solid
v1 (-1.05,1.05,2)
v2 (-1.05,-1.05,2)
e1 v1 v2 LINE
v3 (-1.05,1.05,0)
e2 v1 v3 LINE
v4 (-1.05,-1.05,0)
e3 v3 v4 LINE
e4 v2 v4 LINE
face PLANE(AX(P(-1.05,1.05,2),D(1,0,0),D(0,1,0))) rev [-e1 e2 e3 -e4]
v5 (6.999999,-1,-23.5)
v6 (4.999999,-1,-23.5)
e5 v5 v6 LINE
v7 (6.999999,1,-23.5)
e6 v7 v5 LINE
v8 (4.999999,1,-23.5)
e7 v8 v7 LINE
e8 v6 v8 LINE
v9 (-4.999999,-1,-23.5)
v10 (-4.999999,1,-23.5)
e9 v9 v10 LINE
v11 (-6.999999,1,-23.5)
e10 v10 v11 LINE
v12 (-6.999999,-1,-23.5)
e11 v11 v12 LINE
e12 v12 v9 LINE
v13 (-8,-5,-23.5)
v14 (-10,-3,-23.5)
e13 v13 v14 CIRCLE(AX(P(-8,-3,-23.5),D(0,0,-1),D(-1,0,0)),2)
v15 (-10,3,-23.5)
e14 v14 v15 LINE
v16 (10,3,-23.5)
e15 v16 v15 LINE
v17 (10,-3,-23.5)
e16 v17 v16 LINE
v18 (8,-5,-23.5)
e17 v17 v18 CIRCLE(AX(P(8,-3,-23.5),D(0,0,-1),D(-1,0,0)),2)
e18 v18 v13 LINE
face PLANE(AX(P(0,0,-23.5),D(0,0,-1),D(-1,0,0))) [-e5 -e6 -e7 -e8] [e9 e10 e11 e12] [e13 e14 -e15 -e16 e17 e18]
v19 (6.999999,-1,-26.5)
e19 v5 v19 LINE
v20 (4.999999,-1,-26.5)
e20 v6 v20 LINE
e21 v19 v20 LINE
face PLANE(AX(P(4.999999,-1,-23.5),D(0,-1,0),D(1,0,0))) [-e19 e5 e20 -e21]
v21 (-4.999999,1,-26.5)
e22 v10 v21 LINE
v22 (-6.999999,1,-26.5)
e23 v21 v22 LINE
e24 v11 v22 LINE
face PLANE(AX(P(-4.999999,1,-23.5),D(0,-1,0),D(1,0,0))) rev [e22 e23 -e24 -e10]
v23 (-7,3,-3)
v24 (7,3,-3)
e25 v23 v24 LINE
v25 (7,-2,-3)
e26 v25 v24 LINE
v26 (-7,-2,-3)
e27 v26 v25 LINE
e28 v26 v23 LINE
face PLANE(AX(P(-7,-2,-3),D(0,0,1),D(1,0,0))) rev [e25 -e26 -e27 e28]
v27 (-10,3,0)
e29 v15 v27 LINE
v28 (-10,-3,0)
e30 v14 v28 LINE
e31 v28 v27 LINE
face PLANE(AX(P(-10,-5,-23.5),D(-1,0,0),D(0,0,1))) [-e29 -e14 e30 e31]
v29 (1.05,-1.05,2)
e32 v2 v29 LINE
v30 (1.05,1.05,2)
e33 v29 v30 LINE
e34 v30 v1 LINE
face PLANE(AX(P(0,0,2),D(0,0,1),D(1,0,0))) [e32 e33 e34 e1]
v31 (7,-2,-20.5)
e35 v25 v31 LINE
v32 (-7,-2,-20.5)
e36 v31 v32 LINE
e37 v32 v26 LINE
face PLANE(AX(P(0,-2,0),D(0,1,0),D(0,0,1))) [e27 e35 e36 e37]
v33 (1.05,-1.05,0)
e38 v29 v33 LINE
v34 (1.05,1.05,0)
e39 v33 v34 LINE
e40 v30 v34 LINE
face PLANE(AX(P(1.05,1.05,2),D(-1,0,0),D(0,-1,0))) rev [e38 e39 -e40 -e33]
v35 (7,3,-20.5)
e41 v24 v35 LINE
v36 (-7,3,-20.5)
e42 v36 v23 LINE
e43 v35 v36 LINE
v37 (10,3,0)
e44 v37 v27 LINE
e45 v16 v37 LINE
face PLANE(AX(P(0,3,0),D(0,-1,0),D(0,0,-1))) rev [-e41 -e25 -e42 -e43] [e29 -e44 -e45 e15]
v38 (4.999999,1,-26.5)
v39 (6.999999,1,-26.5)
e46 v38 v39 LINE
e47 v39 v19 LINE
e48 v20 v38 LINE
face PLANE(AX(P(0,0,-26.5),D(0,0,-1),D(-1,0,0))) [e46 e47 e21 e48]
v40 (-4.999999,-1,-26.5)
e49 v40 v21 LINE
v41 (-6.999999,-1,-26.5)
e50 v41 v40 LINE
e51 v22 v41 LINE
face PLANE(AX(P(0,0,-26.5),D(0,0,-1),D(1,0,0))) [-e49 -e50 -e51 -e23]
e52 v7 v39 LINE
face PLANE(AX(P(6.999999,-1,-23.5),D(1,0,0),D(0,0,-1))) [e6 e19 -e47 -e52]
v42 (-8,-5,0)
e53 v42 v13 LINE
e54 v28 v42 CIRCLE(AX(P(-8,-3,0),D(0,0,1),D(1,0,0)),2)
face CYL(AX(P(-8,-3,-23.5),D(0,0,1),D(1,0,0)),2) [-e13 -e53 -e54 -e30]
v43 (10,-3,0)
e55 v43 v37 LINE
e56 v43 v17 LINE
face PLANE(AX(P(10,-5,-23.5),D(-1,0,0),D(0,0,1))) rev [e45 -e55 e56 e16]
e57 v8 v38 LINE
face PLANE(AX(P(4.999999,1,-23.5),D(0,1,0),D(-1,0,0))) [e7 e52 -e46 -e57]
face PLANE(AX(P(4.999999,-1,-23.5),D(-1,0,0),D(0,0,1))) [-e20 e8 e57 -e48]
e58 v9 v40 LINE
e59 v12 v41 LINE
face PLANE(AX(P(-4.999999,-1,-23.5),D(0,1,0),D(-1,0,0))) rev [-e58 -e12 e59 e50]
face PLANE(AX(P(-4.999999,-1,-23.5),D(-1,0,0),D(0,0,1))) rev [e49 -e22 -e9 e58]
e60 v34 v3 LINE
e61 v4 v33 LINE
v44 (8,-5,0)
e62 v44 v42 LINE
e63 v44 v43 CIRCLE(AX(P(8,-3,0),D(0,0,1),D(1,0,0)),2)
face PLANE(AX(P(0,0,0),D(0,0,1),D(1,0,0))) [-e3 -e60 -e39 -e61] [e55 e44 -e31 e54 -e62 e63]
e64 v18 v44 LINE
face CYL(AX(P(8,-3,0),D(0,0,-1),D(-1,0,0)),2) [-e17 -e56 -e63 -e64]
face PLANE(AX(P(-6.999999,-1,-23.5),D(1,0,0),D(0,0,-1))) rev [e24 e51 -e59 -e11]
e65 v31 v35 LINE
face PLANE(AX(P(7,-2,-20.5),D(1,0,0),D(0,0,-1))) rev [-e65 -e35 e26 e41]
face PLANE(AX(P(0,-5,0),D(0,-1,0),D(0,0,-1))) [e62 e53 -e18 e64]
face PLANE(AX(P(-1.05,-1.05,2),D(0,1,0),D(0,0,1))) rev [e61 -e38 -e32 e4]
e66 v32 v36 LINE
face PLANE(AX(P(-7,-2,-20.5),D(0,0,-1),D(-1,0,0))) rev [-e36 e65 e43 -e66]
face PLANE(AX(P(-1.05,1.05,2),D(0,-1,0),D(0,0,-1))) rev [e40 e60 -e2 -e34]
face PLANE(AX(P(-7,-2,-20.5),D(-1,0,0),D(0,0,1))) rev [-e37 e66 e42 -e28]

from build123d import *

# Parameters (mm, degrees)
SKETCH1_W                = 2.1
SKETCH1_H                = 2.1
BOSS_EXTRUDE1_DEPTH      = 2
SKETCH4_W                = 2.2
SKETCH4_H                = 2.2
BOSS_EXTRUDE3_DEPTH      = 2
SWEEP4_START             = -1.1
SWEEP4_DEPTH             = 2.2
SKETCH8_W                = 2.2
SKETCH8_H                = 2.2
SKETCH8_W_2              = 2
SKETCH8_H_2              = 2
CUT_EXTRUDE2_DEPTH       = 5
SKETCH9_W                = 2
SKETCH9_H                = 2
CUT_EXTRUDE3_DEPTH       = 2
BOSS_EXTRUDE4_DEPTH      = 3
BOSS_EXTRUDE4_DEPTH_BACK = 5
SKETCH10_W               = 20
SKETCH10_H               = 23.5
SKETCH11_W               = 14
SKETCH11_H               = 17.5
CUT_EXTRUDE4_DEPTH       = 5
FILLET1_R                = 2


# Read off the part's stored shape, not the designer's step: Sweep4
with BuildPart() as part:
    # Sketch1 → Boss-Extrude1 (new body)
    with BuildSketch(Plane.XY):
        Rectangle(SKETCH1_W, SKETCH1_H)
    extrude(amount=BOSS_EXTRUDE1_DEPTH)

    # Sketch4 → Boss-Extrude3 (add)
    with BuildSketch(Plane.XY):
        Rectangle(SKETCH4_W, SKETCH4_H)
    extrude(amount=-BOSS_EXTRUDE3_DEPTH)

    # Sweep4 outline → Sweep4 (add)
    with BuildSketch(Plane(origin=(0, 0, 0), x_dir=(1, 0, 0), z_dir=(0, 1, 0)).offset(SWEEP4_START)):
        with BuildLine():
            Line((7.09999865, 11.165148445), (7.09999919, 28.5))
            Line((7.09999919, 28.5), (4.89999919, 28.5))
            Line((4.89999919, 28.5), (4.89999865, 11.165148445))
            ThreePointArc((4.89999865, 11.165148445), (4.099633159, 8.481308894), (1.959999989, 6.674225732))
            ThreePointArc((1.959999989, 6.674225732), (-0.2669663, 4.793384792), (-1.1, 2))
            Line((-1.1, 2), (1.1, 2))
            ThreePointArc((1.1, 2), (1.573685829, 3.588395274), (2.839999687, 4.657893766))
            ThreePointArc((2.839999687, 4.657893766), (5.940285288, 7.276319376), (7.09999865, 11.165148445))
        make_face()
    sweep4 = extrude(amount=SWEEP4_DEPTH)

    # Mirror1: Sweep4 across plane
    add(sweep4.mirror(Plane(origin=(0, 0, 0), x_dir=(0, 0, 1), z_dir=(1, 0, 0))))

    # Sketch8 → Cut-Extrude2 (cut)
    with BuildSketch(Plane(origin=(0, 0, -28.5), x_dir=(-1, 0, 0), z_dir=(0, 0, -1))):
        with Locations((-5.99999919, 0)):
            Rectangle(SKETCH8_W, SKETCH8_H)
        with Locations((-5.99999919, 0)):
            Rectangle(SKETCH8_W_2, SKETCH8_H_2, mode=Mode.SUBTRACT)
    cut_extrude2 = extrude(amount=-CUT_EXTRUDE2_DEPTH, mode=Mode.SUBTRACT)

    # Sketch9 → Cut-Extrude3 (cut)
    with BuildSketch(Plane(origin=(0, 0, -28.5), x_dir=(-1, 0, 0), z_dir=(0, 0, -1))):
        with Locations((-5.99999919, 0)):
            Rectangle(SKETCH9_W, SKETCH9_H)
    cut_extrude3 = extrude(amount=-CUT_EXTRUDE3_DEPTH, mode=Mode.SUBTRACT)

    # Mirror2: Cut-Extrude2, Cut-Extrude3 across plane
    add(cut_extrude2.mirror(Plane(origin=(0, 0, 0), x_dir=(0, 0, 1), z_dir=(1, 0, 0))), mode=Mode.SUBTRACT)
    add(cut_extrude3.mirror(Plane(origin=(0, 0, 0), x_dir=(0, 0, 1), z_dir=(1, 0, 0))), mode=Mode.SUBTRACT)

    # Sketch10 → Boss-Extrude4 (add, two sides: drawn at the far end of the back side and taken through both)
    with BuildSketch(Plane(origin=(0, 0, 0), x_dir=(1, 0, 0), z_dir=(0, 1, 0)).offset(-BOSS_EXTRUDE4_DEPTH_BACK)):
        with Locations((0, 11.75)):
            Rectangle(SKETCH10_W, SKETCH10_H)
    extrude(amount=BOSS_EXTRUDE4_DEPTH + BOSS_EXTRUDE4_DEPTH_BACK)

    # Sketch11 → Cut-Extrude4 (cut)
    with BuildSketch(Plane(origin=(0, 3, 0), x_dir=(1, 0, 0), z_dir=(0, 1, 0))):
        with Locations((0, 11.75)):
            Rectangle(SKETCH11_W, SKETCH11_H)
    extrude(amount=-CUT_EXTRUDE4_DEPTH, mode=Mode.SUBTRACT)

    # Fillet1
    fillet1_edges = [part.edges().sort_by_distance(p)[0] for p in [
        (-10, -5, -11.75),
        (10, -5, -11.75),
    ]]
    fillet(fillet1_edges, radius=FILLET1_R)


solid = part.part
